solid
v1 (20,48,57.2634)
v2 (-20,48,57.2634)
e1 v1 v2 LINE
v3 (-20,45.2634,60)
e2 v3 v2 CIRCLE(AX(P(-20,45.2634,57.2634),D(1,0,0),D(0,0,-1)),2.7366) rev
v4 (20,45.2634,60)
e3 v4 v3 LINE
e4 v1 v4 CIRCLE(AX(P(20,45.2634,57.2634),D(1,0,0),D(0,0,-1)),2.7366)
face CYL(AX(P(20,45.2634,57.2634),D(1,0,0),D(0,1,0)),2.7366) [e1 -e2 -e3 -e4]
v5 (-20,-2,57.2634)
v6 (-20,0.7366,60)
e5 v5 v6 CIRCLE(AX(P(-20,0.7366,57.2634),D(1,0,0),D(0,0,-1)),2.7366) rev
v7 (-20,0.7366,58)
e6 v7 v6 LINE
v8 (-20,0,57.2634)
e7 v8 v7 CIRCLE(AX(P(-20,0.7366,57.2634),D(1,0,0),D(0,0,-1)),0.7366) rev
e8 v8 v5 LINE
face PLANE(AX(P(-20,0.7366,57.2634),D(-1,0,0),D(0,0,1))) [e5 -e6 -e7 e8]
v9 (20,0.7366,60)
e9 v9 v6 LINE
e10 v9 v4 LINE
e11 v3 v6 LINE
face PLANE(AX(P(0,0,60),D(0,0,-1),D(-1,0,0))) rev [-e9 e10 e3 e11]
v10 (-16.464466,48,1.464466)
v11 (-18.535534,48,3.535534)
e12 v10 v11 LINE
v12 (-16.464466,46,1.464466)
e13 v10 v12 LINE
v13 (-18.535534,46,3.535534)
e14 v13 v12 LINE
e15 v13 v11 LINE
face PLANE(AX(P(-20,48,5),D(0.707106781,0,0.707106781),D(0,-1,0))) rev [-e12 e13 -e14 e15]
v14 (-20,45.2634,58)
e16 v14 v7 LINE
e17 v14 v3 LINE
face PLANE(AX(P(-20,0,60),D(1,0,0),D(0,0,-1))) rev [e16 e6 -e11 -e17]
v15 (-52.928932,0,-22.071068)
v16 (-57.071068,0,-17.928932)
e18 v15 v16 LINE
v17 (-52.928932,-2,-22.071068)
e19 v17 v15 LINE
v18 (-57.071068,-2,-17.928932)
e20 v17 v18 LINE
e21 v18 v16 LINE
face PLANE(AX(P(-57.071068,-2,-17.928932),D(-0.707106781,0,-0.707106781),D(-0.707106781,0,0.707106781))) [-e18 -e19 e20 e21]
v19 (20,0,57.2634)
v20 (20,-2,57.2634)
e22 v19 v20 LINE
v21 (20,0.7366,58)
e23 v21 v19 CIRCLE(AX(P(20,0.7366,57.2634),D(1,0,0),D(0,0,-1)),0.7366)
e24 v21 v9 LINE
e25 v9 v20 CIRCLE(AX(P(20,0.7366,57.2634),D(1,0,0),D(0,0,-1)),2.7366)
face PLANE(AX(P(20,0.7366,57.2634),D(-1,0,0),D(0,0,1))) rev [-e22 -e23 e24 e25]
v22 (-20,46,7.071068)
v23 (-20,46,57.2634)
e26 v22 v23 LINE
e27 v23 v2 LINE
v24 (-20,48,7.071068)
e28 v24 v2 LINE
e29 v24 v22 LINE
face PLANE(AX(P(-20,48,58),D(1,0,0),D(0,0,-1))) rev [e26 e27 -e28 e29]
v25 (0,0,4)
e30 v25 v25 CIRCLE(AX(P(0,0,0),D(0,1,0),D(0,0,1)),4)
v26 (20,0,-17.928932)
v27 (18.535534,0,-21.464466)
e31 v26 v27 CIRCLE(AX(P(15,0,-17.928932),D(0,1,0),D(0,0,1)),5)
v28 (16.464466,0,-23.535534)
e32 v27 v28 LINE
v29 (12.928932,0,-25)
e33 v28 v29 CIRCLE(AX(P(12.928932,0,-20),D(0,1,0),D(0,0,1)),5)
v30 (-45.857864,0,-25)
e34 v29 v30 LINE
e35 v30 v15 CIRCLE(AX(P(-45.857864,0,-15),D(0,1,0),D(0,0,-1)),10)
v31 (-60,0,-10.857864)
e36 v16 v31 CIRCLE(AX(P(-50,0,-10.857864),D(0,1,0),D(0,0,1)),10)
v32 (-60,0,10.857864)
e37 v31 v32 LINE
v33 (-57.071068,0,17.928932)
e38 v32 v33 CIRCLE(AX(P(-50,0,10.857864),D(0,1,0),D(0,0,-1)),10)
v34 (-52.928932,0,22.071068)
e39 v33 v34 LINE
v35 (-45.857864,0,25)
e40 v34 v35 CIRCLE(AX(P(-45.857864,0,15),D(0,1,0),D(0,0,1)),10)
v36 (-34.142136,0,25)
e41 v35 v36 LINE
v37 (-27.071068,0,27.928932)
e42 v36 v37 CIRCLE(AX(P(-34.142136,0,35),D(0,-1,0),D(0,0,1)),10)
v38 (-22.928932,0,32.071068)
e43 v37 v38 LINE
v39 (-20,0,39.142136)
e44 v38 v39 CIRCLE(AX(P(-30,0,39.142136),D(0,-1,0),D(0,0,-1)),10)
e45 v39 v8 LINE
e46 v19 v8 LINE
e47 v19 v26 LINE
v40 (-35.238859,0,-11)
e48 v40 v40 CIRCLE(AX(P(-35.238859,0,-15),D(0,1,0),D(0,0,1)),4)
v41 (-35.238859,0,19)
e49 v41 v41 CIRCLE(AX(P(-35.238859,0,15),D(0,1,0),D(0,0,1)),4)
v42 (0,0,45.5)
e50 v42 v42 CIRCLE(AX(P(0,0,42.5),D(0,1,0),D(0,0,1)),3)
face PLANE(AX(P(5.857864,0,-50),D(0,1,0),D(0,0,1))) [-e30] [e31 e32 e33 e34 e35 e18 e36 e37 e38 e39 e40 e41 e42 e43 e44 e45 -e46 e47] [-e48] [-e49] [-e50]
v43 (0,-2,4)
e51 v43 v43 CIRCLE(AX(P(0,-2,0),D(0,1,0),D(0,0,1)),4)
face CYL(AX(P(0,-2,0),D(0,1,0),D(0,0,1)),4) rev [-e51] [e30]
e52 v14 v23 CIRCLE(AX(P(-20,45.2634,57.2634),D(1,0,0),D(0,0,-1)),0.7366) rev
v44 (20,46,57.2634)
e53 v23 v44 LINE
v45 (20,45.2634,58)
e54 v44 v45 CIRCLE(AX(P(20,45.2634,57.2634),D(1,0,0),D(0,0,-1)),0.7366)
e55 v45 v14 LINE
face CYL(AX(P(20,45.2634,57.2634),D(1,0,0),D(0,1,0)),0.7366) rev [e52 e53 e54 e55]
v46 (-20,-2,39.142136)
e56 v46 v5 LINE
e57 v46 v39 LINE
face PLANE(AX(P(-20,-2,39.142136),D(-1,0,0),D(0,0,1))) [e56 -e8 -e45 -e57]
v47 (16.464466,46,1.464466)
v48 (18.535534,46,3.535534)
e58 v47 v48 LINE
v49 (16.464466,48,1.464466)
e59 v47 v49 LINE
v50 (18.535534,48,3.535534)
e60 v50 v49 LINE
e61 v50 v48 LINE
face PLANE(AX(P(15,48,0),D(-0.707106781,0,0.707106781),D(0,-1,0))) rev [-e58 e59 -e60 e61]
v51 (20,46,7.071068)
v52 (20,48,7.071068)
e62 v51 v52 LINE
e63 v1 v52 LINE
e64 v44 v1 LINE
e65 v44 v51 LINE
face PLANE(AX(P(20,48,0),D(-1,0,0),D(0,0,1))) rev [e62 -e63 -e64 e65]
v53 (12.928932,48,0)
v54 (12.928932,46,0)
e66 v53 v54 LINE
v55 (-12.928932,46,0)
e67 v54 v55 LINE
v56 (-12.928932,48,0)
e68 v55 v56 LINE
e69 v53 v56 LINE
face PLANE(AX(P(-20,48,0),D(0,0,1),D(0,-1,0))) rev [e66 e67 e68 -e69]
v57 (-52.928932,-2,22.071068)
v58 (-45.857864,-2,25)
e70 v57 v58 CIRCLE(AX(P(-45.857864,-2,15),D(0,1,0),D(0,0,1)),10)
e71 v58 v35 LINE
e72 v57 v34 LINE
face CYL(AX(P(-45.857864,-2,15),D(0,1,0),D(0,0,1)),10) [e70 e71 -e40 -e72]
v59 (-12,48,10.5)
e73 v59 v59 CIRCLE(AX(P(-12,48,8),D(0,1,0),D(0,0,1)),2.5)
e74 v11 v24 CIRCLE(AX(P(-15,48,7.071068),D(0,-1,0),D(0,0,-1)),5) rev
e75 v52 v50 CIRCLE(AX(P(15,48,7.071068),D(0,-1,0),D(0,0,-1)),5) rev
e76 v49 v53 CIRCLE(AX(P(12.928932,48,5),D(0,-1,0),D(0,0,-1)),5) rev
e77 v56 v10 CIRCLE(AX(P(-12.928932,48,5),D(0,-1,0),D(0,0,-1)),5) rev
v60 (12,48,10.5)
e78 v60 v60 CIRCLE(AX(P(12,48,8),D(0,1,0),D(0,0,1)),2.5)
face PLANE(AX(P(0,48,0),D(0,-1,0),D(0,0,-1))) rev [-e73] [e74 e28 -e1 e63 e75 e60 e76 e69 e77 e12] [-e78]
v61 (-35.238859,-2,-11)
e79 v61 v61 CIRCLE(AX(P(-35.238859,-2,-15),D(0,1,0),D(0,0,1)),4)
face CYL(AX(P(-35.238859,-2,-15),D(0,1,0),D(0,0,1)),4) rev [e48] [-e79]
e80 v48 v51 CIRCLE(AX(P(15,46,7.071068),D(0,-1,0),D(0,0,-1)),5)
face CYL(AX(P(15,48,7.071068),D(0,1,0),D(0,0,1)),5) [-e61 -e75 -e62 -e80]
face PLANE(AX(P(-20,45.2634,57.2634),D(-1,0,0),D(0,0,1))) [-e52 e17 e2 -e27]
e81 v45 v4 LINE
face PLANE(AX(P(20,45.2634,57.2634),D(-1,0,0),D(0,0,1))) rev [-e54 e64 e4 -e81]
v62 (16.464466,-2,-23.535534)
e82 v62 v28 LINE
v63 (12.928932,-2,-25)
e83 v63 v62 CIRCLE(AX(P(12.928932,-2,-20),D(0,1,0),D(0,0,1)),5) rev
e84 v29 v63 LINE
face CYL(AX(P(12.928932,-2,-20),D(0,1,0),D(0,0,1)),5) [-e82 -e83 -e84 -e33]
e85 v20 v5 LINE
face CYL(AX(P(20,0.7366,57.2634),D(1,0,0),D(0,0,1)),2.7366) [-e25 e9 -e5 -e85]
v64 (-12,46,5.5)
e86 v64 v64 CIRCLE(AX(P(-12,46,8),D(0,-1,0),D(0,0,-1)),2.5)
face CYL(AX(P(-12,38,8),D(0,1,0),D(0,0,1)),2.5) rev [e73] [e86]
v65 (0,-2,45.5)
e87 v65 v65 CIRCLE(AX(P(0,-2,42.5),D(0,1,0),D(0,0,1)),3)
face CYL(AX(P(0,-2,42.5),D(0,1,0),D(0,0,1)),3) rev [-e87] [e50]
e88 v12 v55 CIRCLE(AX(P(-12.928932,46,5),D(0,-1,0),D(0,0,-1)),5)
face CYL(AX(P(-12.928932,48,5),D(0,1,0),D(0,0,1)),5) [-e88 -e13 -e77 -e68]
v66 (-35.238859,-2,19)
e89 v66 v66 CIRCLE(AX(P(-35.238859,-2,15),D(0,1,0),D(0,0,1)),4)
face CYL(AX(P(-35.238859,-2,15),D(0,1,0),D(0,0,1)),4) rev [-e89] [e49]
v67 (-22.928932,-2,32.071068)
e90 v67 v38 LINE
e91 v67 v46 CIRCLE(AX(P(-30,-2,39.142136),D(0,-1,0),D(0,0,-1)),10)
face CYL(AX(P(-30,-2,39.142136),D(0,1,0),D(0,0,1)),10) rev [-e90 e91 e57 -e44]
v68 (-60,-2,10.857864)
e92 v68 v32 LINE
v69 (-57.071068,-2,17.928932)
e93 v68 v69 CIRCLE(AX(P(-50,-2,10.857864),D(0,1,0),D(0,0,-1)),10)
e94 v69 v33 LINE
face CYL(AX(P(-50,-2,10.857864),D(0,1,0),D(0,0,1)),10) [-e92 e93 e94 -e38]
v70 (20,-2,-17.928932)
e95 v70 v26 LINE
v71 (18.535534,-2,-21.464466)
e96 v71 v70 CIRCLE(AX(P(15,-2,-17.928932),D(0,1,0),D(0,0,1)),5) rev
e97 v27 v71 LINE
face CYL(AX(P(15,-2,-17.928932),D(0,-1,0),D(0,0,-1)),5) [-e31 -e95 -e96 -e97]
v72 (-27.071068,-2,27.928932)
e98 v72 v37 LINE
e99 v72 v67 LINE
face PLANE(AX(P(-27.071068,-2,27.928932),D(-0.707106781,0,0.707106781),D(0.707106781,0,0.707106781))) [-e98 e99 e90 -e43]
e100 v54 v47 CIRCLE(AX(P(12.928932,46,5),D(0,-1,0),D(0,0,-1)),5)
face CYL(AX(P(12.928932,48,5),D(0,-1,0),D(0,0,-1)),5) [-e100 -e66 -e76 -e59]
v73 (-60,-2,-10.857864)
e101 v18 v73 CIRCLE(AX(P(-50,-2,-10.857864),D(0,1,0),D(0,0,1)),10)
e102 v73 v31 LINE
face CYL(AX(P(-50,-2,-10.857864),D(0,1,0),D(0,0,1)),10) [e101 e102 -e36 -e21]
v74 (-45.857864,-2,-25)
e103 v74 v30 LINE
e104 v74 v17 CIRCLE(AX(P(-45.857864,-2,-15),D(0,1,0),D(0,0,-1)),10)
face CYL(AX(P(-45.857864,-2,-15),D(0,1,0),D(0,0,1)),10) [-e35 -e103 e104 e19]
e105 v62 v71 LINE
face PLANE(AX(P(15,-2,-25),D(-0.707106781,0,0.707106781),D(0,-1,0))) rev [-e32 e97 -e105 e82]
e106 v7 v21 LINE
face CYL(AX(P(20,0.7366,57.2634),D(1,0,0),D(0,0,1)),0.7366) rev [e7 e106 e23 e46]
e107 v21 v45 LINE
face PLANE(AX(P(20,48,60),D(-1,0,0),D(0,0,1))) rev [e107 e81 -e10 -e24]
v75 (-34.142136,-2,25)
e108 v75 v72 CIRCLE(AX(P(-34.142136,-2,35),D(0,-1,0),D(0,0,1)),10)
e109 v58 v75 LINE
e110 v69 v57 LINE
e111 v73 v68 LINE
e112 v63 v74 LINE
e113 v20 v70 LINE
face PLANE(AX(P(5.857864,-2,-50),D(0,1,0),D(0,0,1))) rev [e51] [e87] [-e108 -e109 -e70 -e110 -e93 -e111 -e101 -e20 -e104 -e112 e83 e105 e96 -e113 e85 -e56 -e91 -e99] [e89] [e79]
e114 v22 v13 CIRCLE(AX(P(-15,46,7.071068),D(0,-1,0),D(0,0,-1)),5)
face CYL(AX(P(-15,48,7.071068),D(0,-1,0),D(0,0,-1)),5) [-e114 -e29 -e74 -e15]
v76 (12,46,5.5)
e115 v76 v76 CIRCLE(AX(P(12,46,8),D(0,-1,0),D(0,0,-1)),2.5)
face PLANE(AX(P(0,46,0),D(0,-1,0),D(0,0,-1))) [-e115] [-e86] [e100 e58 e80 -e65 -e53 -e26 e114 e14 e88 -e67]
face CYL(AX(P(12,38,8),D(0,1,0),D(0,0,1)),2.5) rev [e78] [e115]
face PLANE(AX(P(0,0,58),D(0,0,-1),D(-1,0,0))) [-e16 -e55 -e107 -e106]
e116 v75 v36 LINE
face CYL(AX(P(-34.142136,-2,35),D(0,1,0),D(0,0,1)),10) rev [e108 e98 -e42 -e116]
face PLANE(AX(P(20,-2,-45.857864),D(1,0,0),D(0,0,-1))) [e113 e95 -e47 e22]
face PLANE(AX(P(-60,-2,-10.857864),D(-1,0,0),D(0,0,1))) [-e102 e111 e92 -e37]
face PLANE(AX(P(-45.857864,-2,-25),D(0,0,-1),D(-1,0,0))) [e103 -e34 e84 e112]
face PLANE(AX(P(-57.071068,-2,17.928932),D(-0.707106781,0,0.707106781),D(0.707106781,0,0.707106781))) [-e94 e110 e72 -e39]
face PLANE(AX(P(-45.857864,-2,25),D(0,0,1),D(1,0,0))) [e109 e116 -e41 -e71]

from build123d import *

# Parameters (mm, degrees)
SKETCH1_R                    = 3
SKETCH1_R_2                  = 4
BASE_FLANGE1_DEPTH           = 2
SKETCH6_W                    = 90.588867986
SKETCH6_H                    = 42.612496281
CUT_EXTRUDE1_DEPTH           = 10
DELETEFACE2_START            = -2
DELETEFACE2_DEPTH            = 2
DELETEFACE3_START            = 50
DELETEFACE3_OUTLINE_W        = 40
DELETEFACE3_OUTLINE_H        = 2
DELETEFACE3_DEPTH            = 10
EDGE_FLANGE1_STRIP_W         = 9.4732
EDGE_FLANGE1_STRIP_H         = 2
EDGE_FLANGE1_STRIP_CUT_DEPTH = 40
EDGE_FLANGE1_DEPTH           = 40
EDGE_FLANGE2_STRIP_W         = 9.4732
EDGE_FLANGE2_STRIP_H         = 2
EDGE_FLANGE2_STRIP_CUT_DEPTH = 40
EDGE_FLANGE2_DEPTH           = 40
SKETCH15_R                   = 2.5
CUT_EXTRUDE2_DEPTH           = 10
CHAMFER1_SIZE                = 5
FILLET1_R                    = 5


# Read off the part's stored shape, not the designer's step: DeleteFace2, DeleteFace3
# Sheet-metal steps are written as plain solids
with BuildPart() as part:
    # Sketch1 → Base-Flange1 (new body)
    with BuildSketch(Plane(origin=(0, 0, 0), x_dir=(1, 0, 0), z_dir=(0, 1, 0))):
        with BuildLine():
            Line((-17.071067812, 52.928932188), (-12.928932188, 57.071067812))
            ThreePointArc((-12.928932188, 57.071067812), (-9.6846987, 59.238795325), (-5.857864376, 60))
            Line((-5.857864376, 60), (5.857864376, 60))
            ThreePointArc((5.857864376, 60), (9.6846987, 59.238795325), (12.928932188, 57.071067812))
            Line((12.928932188, 57.071067812), (17.071067812, 52.928932188))
            ThreePointArc((17.071067812, 52.928932188), (19.238795325, 49.6846987), (20, 45.857864376))
            Line((20, 45.857864376), (20, -45.857864376))
            ThreePointArc((20, -45.857864376), (19.238795325, -49.6846987), (17.071067812, -52.928932188))
            Line((17.071067812, -52.928932188), (12.928932188, -57.071067812))
            ThreePointArc((12.928932188, -57.071067812), (9.6846987, -59.238795325), (5.857864376, -60))
            Line((5.857864376, -60), (-5.857864376, -60))
            ThreePointArc((-5.857864376, -60), (-9.6846987, -59.238795325), (-12.928932188, -57.071067812))
            Line((-12.928932188, -57.071067812), (-17.071067812, -52.928932188))
            ThreePointArc((-17.071067812, -52.928932188), (-19.238795325, -49.6846987), (-20, -45.857864376))
            Line((-20, -45.857864376), (-20, -39.142135624))
            ThreePointArc((-20, -39.142135624), (-20.761204675, -35.3153013), (-22.928932188, -32.071067812))
            Line((-22.928932188, -32.071067812), (-27.071067812, -27.928932188))
            ThreePointArc((-27.071067812, -27.928932188), (-30.3153013, -25.761204675), (-34.142135624, -25))
            Line((-34.142135624, -25), (-45.857864376, -25))
            ThreePointArc((-45.857864376, -25), (-49.6846987, -24.238795325), (-52.928932188, -22.071067812))
            Line((-52.928932188, -22.071067812), (-57.071067812, -17.928932188))
            ThreePointArc((-57.071067812, -17.928932188), (-59.238795325, -14.6846987), (-60, -10.857864376))
            Line((-60, -10.857864376), (-60, 10.857864376))
            ThreePointArc((-60, 10.857864376), (-59.238795325, 14.6846987), (-57.071067812, 17.928932188))
            Line((-57.071067812, 17.928932188), (-52.928932188, 22.071067812))
            ThreePointArc((-52.928932188, 22.071067812), (-49.6846987, 24.238795325), (-45.857864376, 25))
            Line((-45.857864376, 25), (-34.142135624, 25))
            ThreePointArc((-34.142135624, 25), (-30.3153013, 25.761204675), (-27.071067812, 27.928932188))
            Line((-27.071067812, 27.928932188), (-22.928932188, 32.071067812))
            ThreePointArc((-22.928932188, 32.071067812), (-20.761204675, 35.3153013), (-20, 39.142135624))
            Line((-20, 39.142135624), (-20, 45.857864376))
            ThreePointArc((-20, 45.857864376), (-19.238795325, 49.6846987), (-17.071067812, 52.928932188))
        make_face()
        with Locations(Location((0, 42.5, 0), (0, 0, 270))):
            Circle(SKETCH1_R, mode=Mode.SUBTRACT)
        with Locations(Location((0, -42.5, 0), (0, 0, 270))):
            Circle(SKETCH1_R, mode=Mode.SUBTRACT)
        with Locations(Location((0, 0, 0), (0, 0, 270))):
            Circle(SKETCH1_R_2, mode=Mode.SUBTRACT)
        with Locations(Location((-35.23885867, -15, 0), (0, 0, 270))):
            Circle(SKETCH1_R_2, mode=Mode.SUBTRACT)
        with Locations(Location((-35.23885867, 15, 0), (0, 0, 270))):
            Circle(SKETCH1_R_2, mode=Mode.SUBTRACT)
    extrude(amount=-BASE_FLANGE1_DEPTH)

    # Sketch6 → Cut-Extrude1 (cut)
    with BuildSketch(Plane(origin=(0, 0, 0), x_dir=(1, 0, 0), z_dir=(0, 1, 0))):
        with Locations((11.152298369, 46.306248141)):
            Rectangle(SKETCH6_W, SKETCH6_H)
    extrude(amount=-CUT_EXTRUDE1_DEPTH, mode=Mode.SUBTRACT)

    # DeleteFace2 outline → DeleteFace2 (add)
    with BuildSketch(Plane(origin=(0, 0, 0), x_dir=(1, 0, 0), z_dir=(0, 1, 0)).offset(DELETEFACE2_START)):
        with BuildLine():
            Line((5.857864376, -60), (10, -60))
            Line((10, -60), (12.928932188, -57.071067812))
            ThreePointArc((12.928932188, -57.071067812), (9.6846987, -59.238795325), (5.857864376, -60))
        make_face()
        with BuildLine():
            Line((-20, -50), (-17.071067812, -52.928932188))
            ThreePointArc((-17.071067812, -52.928932188), (-19.238795325, -49.6846987), (-20, -45.857864376))
            Line((-20, -45.857864376), (-20, -50))
        make_face()
        with BuildLine():
            Line((-10, -60), (-5.857864376, -60))
            ThreePointArc((-5.857864376, -60), (-9.6846987, -59.238795325), (-12.928932188, -57.071067812))
            Line((-12.928932188, -57.071067812), (-10, -60))
        make_face()
        with BuildLine():
            ThreePointArc((20, -45.857864376), (19.238795325, -49.6846987), (17.071067812, -52.928932188))
            Line((17.071067812, -52.928932188), (20, -50))
            Line((20, -50), (20, -45.857864376))
        make_face()
    extrude(amount=DELETEFACE2_DEPTH)

    # DeleteFace3 outline → DeleteFace3 (add)
    with BuildSketch(Plane.XY.offset(DELETEFACE3_START)):
        with Locations((0, -1)):
            Rectangle(DELETEFACE3_OUTLINE_W, DELETEFACE3_OUTLINE_H)
    extrude(amount=DELETEFACE3_DEPTH)

    # Edge-Flange1 strip (across the edge) → Edge-Flange1 strip cut (cut)
    with BuildSketch(Plane(origin=(-20, 0, 60), x_dir=(0, 0, -1), z_dir=(1, 0, 0))):
        with Locations((-2, -1)):
            Rectangle(EDGE_FLANGE1_STRIP_W, EDGE_FLANGE1_STRIP_H)
    extrude(amount=EDGE_FLANGE1_STRIP_CUT_DEPTH, mode=Mode.SUBTRACT)

    # Edge-Flange1 section (across the edge) → Edge-Flange1 (add)
    with BuildSketch(Plane(origin=(-20, 0, 60), x_dir=(0, 0, -1), z_dir=(1, 0, 0))):
        with BuildLine():
            Line((0, 0.7366), (0, 48))
            Line((0, 48), (2, 48))
            Line((2, 48), (2, 0.7366))
            ThreePointArc((2, 0.7366), (2.215745145, 0.215745145), (2.7366, 0))
            Line((2.7366, 0), (2.7366, -2))
            ThreePointArc((2.7366, -2), (0.801531583, -1.198468417), (0, 0.7366))
        make_face()
    extrude(amount=EDGE_FLANGE1_DEPTH)

    # Edge-Flange2 strip (across the edge) → Edge-Flange2 strip cut (cut)
    with BuildSketch(Plane(origin=(-20, 48, 58), x_dir=(0, -1, 0), z_dir=(1, 0, 0))):
        with Locations((-2, -1)):
            Rectangle(EDGE_FLANGE2_STRIP_W, EDGE_FLANGE2_STRIP_H)
    extrude(amount=EDGE_FLANGE2_STRIP_CUT_DEPTH, mode=Mode.SUBTRACT)

    # Edge-Flange2 section (across the edge) → Edge-Flange2 (add)
    with BuildSketch(Plane(origin=(-20, 48, 58), x_dir=(0, -1, 0), z_dir=(1, 0, 0))):
        with BuildLine():
            Line((0, 0.7366), (0, 58))
            Line((0, 58), (2, 58))
            Line((2, 58), (2, 0.7366))
            ThreePointArc((2, 0.7366), (2.215745145, 0.215745145), (2.7366, 0))
            Line((2.7366, 0), (2.7366, -2))
            ThreePointArc((2.7366, -2), (0.801531583, -1.198468417), (0, 0.7366))
        make_face()
    extrude(amount=EDGE_FLANGE2_DEPTH)

    # Sketch15 → Cut-Extrude2 (cut)
    with BuildSketch(Plane(origin=(0, 48, 0), x_dir=(1, 0, 0), z_dir=(0, 1, 0))):
        with Locations(Location((-12, -8, 0), (0, 0, 270))):
            Circle(SKETCH15_R)
        with Locations(Location((12, -8, 0), (0, 0, 270))):
            Circle(SKETCH15_R)
    extrude(amount=-CUT_EXTRUDE2_DEPTH, mode=Mode.SUBTRACT)

    # Chamfer1
    chamfer1_edges = [part.edges().sort_by_distance(p)[0] for p in [
        (20, -1, -25),
        (-20, 47, 0),
        (20, 47, 0),
    ]]
    chamfer(chamfer1_edges, length=CHAMFER1_SIZE)

    # Fillet1
    fillet1_edges = [part.edges().sort_by_distance(p)[0] for p in [
        (15, -1, -25),
        (20, -1, -20),
        (-15, 47, 0),
        (15, 47, 0),
        (20, 47, 5),
        (-20, 47, 5),
    ]]
    fillet(fillet1_edges, radius=FILLET1_R)


solid = part.part
